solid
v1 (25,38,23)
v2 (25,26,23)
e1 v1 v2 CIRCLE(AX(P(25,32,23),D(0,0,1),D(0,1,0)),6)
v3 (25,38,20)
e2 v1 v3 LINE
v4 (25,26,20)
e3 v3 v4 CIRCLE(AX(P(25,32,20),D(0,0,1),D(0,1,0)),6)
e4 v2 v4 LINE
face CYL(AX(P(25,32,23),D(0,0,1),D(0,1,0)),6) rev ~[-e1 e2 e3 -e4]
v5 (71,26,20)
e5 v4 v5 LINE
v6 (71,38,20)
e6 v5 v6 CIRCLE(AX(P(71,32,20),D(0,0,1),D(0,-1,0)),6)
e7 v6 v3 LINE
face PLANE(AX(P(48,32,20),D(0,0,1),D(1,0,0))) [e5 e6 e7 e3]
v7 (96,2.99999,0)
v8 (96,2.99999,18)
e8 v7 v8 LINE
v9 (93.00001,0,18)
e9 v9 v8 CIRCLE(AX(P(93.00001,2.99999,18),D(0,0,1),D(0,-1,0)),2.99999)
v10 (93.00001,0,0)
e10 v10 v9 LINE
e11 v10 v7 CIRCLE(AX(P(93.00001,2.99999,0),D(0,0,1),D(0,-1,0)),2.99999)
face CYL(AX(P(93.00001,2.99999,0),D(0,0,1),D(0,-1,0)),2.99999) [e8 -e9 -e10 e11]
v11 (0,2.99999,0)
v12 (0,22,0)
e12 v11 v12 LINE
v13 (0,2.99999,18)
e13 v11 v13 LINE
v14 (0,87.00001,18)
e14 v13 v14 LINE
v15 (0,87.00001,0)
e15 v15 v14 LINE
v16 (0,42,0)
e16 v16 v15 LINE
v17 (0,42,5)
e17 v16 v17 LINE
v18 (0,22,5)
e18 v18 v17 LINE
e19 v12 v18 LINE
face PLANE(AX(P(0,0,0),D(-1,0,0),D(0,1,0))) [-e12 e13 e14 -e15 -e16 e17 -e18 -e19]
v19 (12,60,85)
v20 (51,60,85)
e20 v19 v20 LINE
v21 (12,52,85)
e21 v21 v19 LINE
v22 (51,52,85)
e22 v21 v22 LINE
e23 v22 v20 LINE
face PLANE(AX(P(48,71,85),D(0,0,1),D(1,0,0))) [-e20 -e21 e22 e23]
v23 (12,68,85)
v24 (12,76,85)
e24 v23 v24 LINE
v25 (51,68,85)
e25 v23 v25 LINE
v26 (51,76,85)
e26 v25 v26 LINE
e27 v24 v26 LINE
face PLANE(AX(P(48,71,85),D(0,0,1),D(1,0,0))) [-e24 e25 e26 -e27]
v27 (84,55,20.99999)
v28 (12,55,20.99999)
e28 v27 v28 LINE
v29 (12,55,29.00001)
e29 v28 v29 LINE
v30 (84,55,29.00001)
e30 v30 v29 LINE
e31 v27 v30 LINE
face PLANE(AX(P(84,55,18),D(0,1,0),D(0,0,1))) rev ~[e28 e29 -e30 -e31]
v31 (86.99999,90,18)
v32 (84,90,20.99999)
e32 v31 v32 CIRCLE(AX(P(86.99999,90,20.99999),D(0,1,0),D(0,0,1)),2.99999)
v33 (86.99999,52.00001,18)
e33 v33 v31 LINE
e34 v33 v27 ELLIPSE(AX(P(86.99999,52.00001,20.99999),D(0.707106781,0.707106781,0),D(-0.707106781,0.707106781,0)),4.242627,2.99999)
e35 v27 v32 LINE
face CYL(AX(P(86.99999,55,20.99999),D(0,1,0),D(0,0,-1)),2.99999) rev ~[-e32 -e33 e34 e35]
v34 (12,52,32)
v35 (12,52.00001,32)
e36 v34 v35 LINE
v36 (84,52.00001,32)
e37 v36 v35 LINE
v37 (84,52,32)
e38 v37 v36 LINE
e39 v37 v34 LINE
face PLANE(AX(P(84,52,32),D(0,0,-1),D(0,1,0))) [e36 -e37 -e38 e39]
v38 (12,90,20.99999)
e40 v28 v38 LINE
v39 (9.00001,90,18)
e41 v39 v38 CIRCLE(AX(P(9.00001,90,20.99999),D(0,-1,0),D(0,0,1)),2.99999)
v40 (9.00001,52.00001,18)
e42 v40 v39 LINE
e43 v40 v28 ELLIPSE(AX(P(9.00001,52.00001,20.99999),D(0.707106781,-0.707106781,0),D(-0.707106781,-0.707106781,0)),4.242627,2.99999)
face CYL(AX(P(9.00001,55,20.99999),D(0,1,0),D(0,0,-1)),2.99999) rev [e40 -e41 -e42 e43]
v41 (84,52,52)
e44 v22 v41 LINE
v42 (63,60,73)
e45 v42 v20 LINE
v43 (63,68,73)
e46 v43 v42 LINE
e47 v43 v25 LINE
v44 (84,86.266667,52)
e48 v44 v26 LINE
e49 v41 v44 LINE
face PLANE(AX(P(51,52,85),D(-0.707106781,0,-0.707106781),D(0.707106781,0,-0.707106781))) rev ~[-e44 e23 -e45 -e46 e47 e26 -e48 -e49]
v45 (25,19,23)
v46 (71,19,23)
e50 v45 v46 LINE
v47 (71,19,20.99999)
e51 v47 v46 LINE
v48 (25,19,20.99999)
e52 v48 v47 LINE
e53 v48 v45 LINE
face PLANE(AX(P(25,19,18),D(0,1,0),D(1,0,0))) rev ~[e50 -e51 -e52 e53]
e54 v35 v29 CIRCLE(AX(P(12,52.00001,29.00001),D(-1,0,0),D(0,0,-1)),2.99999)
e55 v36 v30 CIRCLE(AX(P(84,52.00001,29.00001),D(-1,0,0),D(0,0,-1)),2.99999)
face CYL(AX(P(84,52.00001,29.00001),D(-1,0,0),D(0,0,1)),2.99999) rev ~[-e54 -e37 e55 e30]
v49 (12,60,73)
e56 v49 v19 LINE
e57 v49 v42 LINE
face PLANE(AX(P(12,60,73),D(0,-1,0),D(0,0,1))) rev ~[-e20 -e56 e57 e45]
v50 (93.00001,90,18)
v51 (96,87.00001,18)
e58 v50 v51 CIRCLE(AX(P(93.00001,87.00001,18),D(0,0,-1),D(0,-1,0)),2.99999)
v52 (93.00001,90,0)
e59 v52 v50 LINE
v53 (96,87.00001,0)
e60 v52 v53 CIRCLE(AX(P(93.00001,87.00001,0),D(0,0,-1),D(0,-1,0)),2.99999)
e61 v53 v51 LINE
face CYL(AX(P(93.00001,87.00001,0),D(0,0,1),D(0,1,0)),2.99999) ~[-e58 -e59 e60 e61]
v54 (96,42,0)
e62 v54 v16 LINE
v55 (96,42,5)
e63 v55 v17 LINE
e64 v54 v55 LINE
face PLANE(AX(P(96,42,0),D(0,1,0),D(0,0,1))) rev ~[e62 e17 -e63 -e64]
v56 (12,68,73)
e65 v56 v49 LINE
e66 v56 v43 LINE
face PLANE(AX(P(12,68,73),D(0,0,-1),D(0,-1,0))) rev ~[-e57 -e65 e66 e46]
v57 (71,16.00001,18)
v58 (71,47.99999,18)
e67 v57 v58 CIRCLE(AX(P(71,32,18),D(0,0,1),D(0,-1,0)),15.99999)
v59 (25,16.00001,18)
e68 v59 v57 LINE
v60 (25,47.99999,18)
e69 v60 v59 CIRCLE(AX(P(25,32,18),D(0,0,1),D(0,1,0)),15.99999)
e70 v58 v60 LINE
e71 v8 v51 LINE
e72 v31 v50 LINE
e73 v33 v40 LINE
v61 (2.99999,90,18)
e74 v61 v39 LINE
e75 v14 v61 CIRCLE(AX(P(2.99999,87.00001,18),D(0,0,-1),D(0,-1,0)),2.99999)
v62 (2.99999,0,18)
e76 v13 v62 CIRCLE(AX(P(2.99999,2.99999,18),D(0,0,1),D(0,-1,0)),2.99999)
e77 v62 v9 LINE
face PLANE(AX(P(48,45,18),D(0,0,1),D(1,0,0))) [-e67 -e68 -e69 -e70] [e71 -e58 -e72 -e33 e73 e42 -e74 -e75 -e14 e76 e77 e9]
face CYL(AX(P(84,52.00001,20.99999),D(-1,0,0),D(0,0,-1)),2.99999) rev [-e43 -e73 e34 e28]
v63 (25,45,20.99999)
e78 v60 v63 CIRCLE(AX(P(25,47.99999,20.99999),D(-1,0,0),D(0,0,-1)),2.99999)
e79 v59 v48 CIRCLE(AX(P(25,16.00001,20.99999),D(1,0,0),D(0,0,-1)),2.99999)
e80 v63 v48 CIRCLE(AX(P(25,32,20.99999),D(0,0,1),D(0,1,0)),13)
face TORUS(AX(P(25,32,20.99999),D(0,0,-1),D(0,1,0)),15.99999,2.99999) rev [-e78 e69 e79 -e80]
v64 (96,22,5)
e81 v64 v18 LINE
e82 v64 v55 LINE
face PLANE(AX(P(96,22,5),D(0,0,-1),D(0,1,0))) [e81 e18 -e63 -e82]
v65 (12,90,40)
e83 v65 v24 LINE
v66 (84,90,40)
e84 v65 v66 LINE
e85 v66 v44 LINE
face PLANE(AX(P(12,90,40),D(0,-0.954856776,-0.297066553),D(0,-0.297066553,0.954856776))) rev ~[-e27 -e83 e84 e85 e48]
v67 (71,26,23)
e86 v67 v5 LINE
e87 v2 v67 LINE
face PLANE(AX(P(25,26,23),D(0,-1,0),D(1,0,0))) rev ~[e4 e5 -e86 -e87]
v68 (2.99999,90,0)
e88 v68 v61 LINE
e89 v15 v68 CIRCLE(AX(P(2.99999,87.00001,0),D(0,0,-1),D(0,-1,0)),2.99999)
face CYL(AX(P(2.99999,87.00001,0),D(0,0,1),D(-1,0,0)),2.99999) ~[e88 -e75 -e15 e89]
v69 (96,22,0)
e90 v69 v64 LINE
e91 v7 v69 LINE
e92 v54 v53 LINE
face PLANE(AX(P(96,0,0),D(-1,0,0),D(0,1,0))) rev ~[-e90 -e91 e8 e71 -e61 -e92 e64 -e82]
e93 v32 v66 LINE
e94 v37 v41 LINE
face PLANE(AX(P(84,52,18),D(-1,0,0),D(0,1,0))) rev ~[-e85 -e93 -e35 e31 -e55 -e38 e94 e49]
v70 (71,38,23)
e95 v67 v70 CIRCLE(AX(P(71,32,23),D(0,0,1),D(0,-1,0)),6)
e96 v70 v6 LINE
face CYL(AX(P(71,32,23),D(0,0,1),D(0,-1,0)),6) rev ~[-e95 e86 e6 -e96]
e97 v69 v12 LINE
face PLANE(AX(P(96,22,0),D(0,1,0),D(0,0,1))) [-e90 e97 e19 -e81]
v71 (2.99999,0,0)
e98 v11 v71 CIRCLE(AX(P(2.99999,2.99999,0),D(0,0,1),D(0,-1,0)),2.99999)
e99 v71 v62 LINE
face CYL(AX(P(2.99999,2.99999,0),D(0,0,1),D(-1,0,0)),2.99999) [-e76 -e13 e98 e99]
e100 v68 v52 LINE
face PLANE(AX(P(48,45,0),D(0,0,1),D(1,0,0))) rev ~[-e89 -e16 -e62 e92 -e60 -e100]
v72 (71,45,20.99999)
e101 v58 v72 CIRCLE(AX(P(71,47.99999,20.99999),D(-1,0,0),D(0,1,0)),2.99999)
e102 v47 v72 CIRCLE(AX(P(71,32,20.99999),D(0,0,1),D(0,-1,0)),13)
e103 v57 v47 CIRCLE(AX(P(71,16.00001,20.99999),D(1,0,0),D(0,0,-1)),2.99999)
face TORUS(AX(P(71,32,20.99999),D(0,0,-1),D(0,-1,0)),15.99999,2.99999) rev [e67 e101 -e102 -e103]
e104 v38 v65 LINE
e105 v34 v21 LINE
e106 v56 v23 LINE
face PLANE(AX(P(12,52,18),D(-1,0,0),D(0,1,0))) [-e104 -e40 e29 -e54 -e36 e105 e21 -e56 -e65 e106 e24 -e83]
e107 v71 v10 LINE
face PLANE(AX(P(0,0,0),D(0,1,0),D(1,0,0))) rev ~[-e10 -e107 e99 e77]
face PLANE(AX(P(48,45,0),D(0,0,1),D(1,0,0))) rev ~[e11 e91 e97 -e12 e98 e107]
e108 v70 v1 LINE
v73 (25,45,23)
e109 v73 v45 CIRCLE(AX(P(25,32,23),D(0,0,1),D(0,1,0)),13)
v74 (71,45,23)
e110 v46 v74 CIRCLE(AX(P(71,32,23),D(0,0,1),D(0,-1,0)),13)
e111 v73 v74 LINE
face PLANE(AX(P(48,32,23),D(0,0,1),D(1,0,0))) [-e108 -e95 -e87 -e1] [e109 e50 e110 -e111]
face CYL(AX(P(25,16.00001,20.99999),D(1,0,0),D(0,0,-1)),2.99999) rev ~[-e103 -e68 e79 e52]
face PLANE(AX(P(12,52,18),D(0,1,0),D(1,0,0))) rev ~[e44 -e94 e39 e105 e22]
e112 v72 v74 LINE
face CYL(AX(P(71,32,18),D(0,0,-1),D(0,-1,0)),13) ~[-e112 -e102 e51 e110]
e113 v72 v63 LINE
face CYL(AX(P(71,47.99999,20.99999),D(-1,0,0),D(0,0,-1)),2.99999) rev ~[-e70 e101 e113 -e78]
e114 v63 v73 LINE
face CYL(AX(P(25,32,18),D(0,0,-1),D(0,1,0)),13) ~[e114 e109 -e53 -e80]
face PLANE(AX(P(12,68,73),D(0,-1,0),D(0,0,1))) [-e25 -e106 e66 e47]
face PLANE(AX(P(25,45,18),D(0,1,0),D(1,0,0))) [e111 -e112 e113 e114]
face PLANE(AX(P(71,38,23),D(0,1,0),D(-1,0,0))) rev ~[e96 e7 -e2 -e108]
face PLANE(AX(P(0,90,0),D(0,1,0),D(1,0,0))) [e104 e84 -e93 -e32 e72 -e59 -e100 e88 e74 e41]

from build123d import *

# Parameters (mm, degrees)
F0_W      = 96
F0_H      = 90
F1_DEPTH  = 18
F2_W      = 72
F2_H      = 38
F4_DEPTH  = 67
F6_DEPTH  = 38
F7_W      = 8
F7_H      = 12
F8_DEPTH  = 51.001
F10_DEPTH = 72.001
F11_W     = 20
F11_H     = 5
F12_DEPTH = 96
F14_W     = 46
F14_H     = 26
F15_DEPTH = 5
F17_DEPTH = 3
F18_W     = 3
F18_H     = 14
F19_DEPTH = 72
F20_R     = 2.99999


# Not quite as in the source:
# - a fillet or chamfer is up to 0.001 mm smaller than in the source, because OpenCascade refuses the exact size


with BuildPart() as f1:
    # F0 (on Top) → F1 (new body)
    with BuildSketch(Plane.XY):
        with Locations((48, 45)):
            Rectangle(F0_W, F0_H)
    extrude(amount=F1_DEPTH)

    # F2 (on face) → F4 (join, through all)
    with BuildSketch(Plane.XY.offset(18)):
        with Locations((48, 71)):
            Rectangle(F2_W, F2_H)
    extrude(amount=F4_DEPTH)

    # F5 (on face) → F6 (cut)
    with BuildSketch(Plane.XZ.offset(-52)):
        Polygon((84, 52), (84, 85), (51, 85), align=None)
    extrude(amount=-F6_DEPTH, mode=Mode.SUBTRACT)

    # F7 (on face) → F8 (cut, through all)
    with BuildSketch(Plane(origin=(12, 0, 0), x_dir=(0, -1, 0), z_dir=(-1, 0, 0))):
        with Locations((-64, 79)):
            Rectangle(F7_W, F7_H)
    extrude(amount=-F8_DEPTH, mode=Mode.SUBTRACT)

    # F9 (on face) → F10 (cut, through all)
    with BuildSketch(Plane(origin=(12, 0, 0), x_dir=(0, -1, 0), z_dir=(-1, 0, 0))):
        Polygon((-76, 85), (-90, 85), (-90, 40), align=None)
    extrude(amount=-F10_DEPTH, mode=Mode.SUBTRACT)

    # F11 (on face) → F12 (cut, through all)
    with BuildSketch(Plane.YZ.offset(96)):
        with Locations((32, 2.5)):
            Rectangle(F11_W, F11_H)
    extrude(amount=-F12_DEPTH, mode=Mode.SUBTRACT)

    # F14 (on face) → F15 (join)
    with BuildSketch(Plane.XY.offset(18)):
        with Locations((48, 32)):
            Rectangle(F14_W, F14_H)
        with BuildLine():
            Line((25, 19), (25, 45))
            ThreePointArc((25, 45), (12, 32), (25, 19))
        make_face()
        with BuildLine():
            ThreePointArc((71, 19), (84, 32), (71, 45))
            Line((71, 45), (71, 19))
        make_face()
    extrude(amount=F15_DEPTH)

    # F16 (on face) → F17 (cut)
    with BuildSketch(Plane.XY.offset(23)):
        with BuildLine():
            ThreePointArc((25, 38), (19, 32), (25, 26))
            Line((25, 26), (71, 26))
            ThreePointArc((71, 26), (77, 32), (71, 38))
            Line((71, 38), (25, 38))
        make_face()
    extrude(amount=-F17_DEPTH, mode=Mode.SUBTRACT)

    # F18 (on face) → F19 (cut, through all)
    with BuildSketch(Plane.YZ.offset(84)):
        with Locations((53.5, 25)):
            Rectangle(F18_W, F18_H)
    extrude(amount=-F19_DEPTH, mode=Mode.SUBTRACT)

    # F20 (radius 3 in the source; OpenCascade refuses exactly that, so slightly less here)
    f20_edges = [f1.edges().sort_by_distance(p)[0] for p in [
        (48, 19, 18),
        (48, 55, 18),
        (48, 55, 32),
        (0, 0, 9),
        (96, 0, 9),
        (96, 90, 9),
        (0, 90, 9),
        (84, 72.5, 18),
        (12, 72.5, 18),
    ]]
    fillet(f20_edges, radius=F20_R)


solid = f1.part
